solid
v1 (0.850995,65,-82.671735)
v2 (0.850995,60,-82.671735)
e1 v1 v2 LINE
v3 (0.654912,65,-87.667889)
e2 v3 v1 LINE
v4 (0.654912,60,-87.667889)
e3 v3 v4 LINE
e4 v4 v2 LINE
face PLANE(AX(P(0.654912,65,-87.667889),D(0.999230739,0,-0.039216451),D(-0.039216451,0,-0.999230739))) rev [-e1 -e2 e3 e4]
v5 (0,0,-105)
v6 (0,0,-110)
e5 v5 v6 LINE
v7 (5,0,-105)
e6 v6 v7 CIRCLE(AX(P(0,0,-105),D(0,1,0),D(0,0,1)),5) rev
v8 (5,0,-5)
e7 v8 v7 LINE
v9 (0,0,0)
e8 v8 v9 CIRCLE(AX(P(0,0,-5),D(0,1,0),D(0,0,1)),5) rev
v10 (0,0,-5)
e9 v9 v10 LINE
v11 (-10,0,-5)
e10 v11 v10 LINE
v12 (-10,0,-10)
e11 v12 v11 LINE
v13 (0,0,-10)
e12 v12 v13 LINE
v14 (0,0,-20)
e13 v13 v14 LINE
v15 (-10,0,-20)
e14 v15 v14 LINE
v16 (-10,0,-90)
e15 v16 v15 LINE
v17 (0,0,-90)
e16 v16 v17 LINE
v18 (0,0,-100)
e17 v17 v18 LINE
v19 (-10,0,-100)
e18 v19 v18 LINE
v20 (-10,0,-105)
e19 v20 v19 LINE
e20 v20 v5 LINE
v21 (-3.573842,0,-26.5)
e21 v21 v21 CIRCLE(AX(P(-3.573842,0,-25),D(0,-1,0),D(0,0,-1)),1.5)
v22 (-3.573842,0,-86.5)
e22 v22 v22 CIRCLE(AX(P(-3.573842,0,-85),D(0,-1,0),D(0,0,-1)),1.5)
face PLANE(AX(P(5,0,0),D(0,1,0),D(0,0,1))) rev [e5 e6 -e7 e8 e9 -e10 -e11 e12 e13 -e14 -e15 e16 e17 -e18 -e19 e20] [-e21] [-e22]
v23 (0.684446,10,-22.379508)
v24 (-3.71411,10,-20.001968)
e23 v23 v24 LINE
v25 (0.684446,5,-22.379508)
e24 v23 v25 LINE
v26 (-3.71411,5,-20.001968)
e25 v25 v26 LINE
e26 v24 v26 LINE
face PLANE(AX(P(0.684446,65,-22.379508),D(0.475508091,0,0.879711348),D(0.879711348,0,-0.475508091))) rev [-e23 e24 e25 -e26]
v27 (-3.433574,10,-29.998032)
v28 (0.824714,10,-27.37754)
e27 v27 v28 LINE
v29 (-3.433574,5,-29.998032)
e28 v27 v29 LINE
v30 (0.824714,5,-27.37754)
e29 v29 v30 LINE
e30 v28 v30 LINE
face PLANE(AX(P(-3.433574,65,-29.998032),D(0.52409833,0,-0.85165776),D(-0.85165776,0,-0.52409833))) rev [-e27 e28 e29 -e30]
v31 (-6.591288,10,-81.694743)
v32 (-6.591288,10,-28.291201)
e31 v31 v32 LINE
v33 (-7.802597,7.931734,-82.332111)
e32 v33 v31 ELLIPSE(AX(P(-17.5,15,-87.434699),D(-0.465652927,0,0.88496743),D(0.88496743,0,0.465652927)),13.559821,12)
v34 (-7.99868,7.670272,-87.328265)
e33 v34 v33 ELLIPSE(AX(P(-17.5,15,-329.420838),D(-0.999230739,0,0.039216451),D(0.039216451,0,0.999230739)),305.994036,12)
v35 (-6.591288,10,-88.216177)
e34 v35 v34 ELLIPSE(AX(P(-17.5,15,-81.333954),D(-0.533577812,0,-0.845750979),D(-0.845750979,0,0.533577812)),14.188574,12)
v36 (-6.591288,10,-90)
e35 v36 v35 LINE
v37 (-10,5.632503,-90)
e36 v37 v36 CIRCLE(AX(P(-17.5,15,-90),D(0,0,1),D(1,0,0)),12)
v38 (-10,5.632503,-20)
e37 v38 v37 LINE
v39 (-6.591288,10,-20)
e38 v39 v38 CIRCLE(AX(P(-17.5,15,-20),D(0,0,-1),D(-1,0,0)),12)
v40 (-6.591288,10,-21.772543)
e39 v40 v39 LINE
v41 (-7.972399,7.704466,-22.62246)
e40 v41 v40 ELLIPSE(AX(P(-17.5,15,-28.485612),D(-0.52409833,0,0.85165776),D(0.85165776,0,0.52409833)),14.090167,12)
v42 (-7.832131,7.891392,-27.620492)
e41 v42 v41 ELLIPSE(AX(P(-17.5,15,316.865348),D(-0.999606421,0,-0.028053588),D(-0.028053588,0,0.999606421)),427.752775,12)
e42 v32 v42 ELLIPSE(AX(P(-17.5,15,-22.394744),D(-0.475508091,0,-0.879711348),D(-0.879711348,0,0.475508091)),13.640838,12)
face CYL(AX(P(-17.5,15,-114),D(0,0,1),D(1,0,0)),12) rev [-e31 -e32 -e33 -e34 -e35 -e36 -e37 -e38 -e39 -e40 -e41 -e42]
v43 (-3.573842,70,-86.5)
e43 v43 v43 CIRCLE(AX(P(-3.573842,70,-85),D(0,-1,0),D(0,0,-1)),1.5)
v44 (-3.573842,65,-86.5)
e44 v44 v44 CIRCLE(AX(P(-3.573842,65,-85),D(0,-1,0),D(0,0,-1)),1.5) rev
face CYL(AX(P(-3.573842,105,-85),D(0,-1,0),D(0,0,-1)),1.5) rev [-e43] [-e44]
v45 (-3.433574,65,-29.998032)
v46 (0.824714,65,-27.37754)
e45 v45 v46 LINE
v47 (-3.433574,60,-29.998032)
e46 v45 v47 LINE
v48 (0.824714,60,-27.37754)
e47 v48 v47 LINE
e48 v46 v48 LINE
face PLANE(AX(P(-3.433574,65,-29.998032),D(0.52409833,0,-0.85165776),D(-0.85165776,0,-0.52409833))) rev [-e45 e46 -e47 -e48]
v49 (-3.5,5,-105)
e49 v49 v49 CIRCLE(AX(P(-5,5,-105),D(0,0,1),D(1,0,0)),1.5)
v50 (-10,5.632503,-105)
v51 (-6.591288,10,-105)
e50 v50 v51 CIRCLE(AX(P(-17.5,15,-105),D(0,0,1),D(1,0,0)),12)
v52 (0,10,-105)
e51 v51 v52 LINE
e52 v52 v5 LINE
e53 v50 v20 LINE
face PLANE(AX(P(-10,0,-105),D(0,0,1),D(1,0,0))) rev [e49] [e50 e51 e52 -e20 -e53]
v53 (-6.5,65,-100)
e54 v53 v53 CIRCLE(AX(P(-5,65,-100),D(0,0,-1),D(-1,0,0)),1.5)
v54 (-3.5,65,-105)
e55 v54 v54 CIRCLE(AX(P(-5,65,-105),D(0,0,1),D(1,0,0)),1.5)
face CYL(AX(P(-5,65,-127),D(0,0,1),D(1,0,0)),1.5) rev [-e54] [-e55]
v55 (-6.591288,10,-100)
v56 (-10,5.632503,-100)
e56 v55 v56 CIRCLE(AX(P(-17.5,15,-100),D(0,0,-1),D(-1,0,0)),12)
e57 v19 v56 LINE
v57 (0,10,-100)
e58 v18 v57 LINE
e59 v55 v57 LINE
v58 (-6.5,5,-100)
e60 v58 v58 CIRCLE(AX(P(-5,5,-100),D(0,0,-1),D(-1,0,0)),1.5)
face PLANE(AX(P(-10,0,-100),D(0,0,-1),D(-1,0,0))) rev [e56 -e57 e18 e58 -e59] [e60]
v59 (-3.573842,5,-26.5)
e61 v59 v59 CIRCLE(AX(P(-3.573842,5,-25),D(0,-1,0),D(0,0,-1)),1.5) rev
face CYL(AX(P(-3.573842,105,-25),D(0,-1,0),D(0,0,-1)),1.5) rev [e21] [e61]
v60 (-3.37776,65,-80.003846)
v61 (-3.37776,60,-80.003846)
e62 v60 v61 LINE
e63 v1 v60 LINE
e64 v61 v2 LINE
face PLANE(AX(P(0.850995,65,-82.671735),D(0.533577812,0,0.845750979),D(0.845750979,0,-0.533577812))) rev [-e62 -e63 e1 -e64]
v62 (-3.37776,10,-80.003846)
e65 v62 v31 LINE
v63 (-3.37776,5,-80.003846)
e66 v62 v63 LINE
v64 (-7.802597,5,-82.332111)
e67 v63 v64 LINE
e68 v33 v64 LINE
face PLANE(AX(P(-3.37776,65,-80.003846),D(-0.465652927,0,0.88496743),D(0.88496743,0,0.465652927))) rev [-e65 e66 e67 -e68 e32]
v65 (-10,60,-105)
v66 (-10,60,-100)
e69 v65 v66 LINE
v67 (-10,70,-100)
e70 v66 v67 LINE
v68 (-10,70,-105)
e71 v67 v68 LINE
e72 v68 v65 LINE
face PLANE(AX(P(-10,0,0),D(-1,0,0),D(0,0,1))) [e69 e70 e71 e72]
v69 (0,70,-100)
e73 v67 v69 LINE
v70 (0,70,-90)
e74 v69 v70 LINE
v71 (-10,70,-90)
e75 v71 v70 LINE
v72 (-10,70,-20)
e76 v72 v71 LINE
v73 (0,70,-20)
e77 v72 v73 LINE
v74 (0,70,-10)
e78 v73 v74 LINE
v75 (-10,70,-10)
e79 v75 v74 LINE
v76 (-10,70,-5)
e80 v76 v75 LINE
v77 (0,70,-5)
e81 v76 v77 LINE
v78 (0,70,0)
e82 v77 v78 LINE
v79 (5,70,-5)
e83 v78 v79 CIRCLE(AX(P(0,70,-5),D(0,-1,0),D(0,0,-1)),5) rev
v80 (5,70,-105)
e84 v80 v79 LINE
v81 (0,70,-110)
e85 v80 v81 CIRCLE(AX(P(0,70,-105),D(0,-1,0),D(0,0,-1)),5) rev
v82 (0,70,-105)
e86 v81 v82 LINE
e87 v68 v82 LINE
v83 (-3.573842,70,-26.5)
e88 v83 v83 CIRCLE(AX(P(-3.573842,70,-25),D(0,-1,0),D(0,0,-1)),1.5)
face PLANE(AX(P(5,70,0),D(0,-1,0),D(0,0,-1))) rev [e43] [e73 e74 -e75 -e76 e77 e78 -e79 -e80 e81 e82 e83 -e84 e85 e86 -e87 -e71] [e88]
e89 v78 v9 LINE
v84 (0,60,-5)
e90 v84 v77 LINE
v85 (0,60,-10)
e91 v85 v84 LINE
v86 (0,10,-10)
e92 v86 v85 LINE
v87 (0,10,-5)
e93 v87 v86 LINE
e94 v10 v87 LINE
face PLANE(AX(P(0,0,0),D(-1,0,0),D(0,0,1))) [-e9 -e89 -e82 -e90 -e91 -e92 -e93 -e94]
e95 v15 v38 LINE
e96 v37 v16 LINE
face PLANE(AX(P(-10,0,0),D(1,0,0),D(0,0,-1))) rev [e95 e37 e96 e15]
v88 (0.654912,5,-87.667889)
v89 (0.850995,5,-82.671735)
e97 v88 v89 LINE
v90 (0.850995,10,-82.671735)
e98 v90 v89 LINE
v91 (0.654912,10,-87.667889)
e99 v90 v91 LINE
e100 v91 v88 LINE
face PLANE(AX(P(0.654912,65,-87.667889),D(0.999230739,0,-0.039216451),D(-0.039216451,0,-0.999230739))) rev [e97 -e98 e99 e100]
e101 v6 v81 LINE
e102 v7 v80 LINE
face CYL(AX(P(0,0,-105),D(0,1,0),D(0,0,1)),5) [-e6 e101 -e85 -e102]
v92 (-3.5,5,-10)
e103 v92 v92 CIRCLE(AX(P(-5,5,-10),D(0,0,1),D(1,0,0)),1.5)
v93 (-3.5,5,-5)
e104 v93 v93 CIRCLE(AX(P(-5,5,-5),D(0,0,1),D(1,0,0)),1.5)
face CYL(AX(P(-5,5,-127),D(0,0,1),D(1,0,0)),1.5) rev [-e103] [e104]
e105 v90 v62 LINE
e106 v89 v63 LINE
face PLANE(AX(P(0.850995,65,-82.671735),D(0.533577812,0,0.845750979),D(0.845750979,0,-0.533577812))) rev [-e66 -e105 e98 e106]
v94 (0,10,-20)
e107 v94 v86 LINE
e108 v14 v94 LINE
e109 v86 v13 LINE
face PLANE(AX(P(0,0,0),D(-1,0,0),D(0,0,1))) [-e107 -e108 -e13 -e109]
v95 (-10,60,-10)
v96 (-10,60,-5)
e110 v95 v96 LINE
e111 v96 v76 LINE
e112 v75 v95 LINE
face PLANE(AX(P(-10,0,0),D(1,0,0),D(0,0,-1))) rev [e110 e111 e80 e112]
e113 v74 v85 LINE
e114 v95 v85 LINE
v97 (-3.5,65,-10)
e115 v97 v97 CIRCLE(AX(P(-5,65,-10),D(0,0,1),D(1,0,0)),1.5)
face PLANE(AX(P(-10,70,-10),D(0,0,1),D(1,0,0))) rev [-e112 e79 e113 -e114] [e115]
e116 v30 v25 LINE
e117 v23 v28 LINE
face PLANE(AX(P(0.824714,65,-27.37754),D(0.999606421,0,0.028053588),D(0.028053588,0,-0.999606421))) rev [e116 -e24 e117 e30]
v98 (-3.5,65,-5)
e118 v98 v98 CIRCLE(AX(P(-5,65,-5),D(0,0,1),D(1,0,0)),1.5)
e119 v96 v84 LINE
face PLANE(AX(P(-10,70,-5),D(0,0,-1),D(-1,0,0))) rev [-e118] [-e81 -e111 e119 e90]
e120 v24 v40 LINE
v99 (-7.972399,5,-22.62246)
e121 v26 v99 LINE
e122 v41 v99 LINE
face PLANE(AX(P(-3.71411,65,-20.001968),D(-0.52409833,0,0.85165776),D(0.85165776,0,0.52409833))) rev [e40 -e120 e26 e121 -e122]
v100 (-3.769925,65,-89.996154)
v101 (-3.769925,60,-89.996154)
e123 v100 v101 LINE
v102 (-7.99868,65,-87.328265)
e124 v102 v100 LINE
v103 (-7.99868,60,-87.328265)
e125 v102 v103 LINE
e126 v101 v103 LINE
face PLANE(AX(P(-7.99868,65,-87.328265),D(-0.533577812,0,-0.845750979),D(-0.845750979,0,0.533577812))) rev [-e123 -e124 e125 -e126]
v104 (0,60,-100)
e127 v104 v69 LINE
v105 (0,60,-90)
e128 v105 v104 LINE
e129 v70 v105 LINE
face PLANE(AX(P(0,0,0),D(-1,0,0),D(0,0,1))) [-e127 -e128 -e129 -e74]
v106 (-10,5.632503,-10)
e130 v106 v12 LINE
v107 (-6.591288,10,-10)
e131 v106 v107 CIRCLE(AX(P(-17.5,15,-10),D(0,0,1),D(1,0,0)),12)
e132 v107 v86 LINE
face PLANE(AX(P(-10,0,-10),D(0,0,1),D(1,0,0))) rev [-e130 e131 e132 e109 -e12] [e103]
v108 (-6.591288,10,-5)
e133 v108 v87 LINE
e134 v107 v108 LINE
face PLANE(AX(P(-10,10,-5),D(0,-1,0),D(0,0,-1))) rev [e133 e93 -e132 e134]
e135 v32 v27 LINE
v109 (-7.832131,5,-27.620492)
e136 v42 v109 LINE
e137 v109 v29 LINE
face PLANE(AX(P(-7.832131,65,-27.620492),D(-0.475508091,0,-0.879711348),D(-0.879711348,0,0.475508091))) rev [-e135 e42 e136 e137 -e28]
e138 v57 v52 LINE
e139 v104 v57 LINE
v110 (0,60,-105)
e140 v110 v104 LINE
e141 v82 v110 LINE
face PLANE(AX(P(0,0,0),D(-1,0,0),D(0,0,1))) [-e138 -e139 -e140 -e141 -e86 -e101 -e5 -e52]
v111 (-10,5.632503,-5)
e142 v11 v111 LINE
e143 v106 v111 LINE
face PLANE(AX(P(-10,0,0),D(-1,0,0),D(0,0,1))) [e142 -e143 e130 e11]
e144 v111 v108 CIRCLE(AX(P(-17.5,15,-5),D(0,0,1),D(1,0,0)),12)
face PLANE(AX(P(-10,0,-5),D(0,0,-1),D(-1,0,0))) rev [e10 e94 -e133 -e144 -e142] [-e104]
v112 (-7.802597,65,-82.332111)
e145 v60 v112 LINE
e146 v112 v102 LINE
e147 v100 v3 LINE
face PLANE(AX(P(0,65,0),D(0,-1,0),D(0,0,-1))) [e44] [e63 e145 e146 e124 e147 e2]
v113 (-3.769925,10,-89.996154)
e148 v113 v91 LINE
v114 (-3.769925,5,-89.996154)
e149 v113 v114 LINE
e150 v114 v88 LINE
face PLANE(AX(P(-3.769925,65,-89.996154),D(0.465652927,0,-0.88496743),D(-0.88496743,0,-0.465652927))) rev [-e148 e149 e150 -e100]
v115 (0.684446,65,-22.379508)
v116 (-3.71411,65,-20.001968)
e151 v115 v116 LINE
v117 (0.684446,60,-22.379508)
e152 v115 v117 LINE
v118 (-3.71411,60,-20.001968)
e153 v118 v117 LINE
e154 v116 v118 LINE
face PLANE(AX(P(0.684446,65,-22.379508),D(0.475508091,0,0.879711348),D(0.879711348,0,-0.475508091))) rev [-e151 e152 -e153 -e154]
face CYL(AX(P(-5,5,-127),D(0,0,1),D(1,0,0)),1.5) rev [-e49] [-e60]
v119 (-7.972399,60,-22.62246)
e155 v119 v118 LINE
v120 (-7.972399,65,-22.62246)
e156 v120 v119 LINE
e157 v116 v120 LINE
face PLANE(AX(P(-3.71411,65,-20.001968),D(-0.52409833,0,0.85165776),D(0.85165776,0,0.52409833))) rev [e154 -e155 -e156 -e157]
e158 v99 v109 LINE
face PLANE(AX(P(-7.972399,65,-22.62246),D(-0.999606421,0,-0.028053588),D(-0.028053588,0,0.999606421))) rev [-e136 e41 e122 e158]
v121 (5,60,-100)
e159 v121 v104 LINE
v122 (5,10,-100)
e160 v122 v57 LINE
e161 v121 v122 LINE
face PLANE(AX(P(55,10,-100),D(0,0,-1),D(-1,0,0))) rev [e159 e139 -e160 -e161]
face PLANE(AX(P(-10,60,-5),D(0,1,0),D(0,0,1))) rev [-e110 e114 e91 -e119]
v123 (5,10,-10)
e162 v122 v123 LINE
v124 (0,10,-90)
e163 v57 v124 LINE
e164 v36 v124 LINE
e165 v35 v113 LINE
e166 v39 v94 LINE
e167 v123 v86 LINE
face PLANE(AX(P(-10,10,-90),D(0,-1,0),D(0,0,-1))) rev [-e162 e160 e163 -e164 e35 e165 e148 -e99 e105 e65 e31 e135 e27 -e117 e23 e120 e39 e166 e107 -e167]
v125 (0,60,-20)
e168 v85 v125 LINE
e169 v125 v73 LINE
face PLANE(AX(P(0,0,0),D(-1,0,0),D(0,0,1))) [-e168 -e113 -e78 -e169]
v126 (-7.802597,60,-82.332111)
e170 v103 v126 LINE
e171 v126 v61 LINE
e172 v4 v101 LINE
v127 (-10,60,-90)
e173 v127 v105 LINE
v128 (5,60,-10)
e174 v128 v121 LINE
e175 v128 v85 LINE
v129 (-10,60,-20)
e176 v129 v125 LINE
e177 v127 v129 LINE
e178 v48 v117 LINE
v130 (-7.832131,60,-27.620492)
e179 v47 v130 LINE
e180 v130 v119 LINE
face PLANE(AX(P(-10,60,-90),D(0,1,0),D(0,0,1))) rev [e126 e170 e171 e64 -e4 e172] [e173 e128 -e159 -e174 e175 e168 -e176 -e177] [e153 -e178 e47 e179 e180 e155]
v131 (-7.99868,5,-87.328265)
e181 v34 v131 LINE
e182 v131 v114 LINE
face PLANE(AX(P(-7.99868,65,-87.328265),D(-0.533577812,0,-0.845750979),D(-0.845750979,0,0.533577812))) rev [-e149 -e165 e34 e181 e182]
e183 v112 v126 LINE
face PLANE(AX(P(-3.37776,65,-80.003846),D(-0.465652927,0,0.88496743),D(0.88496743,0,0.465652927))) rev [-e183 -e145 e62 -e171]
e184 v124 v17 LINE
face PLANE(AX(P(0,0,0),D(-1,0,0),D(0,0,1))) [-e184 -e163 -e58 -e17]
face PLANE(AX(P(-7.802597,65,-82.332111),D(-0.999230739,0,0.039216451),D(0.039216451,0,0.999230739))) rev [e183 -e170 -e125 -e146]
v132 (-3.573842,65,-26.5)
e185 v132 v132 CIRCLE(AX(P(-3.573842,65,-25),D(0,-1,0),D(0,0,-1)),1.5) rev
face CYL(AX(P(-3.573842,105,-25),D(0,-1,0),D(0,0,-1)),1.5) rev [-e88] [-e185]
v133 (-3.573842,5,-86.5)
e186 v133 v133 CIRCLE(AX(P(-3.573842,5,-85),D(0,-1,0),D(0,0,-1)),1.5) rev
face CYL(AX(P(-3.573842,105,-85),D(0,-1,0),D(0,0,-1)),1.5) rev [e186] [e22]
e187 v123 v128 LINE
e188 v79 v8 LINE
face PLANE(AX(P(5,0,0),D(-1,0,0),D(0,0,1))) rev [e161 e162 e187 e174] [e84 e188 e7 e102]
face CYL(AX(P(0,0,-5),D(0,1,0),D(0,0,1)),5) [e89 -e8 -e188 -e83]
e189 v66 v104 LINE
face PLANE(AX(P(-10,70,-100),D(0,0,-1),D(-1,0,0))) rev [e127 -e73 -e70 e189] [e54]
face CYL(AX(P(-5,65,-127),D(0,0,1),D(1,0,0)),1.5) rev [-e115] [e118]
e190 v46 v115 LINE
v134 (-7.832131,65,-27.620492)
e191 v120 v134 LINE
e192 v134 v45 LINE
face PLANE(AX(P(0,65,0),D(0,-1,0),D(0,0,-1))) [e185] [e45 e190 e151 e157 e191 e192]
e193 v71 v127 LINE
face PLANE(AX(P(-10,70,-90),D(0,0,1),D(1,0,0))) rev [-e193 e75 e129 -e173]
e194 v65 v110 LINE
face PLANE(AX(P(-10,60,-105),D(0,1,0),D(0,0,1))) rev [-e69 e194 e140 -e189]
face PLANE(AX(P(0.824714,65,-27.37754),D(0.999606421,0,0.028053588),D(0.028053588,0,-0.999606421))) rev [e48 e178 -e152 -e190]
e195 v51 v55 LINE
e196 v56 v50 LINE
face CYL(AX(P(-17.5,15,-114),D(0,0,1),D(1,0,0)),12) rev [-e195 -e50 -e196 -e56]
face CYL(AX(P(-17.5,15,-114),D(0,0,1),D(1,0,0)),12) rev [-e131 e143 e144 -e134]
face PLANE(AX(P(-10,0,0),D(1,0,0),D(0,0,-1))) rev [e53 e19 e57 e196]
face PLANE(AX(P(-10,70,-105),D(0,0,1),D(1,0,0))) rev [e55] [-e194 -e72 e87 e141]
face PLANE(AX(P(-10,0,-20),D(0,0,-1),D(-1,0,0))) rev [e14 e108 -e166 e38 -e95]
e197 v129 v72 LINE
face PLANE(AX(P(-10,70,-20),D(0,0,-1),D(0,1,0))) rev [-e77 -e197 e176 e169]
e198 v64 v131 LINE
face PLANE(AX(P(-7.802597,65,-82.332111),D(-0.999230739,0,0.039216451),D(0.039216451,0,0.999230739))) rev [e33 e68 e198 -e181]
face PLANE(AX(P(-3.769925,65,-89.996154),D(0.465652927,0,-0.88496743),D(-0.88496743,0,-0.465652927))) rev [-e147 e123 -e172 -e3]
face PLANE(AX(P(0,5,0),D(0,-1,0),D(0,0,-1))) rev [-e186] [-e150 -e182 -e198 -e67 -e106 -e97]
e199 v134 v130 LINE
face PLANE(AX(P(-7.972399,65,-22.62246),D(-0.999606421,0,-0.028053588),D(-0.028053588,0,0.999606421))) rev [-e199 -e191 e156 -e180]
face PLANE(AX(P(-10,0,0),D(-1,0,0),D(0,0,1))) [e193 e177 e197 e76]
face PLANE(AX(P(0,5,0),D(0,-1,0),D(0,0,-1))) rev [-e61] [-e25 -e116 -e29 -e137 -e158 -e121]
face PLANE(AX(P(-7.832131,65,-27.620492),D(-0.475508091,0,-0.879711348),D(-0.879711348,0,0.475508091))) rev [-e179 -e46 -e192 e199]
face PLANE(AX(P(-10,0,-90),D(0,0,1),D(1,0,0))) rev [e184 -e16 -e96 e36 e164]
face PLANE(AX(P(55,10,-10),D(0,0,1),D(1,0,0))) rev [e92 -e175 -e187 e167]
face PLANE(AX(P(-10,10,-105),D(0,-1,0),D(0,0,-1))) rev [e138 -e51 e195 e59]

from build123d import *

# Parameters (mm, degrees)
SKETCH1_W               = 110
SKETCH1_H               = 70
BOSS_EXTRUDE1_DEPTH     = 5
FILLET2_R               = 5
FILLET3_R               = 5
SKETCH2_W               = 5
SKETCH2_H               = 10
BOSS_EXTRUDE2_DEPTH     = 10
SKETCH3_R               = 1.5
CUT_EXTRUDE1_DEPTH      = 122
SKETCH4_W               = 70
SKETCH4_H               = 10
BOSS_EXTRUDE3_DEPTH     = 10
SKETCH5_R               = 11.5
CUT_EXTRUDE2_DEPTH      = 105
SKETCH6_R               = 1.5
CUT_EXTRUDE3_DEPTH      = 105
CUT_EXTRUDE4_DEPTH      = 55
CUT_EXTRUDE4_DEPTH_BACK = 5
SKETCH9_W               = 90
SKETCH9_H               = 50
CUT_EXTRUDE5_DEPTH      = 55
SKETCH10_R              = 12
CUT_EXTRUDE6_DEPTH      = 109


with BuildPart() as part:
    # Sketch1 → Boss-Extrude1 (new body)
    with BuildSketch(Plane(origin=(0, 0, 0), x_dir=(0, 0, -1), z_dir=(1, 0, 0))):
        with Locations((55, 35)):
            Rectangle(SKETCH1_W, SKETCH1_H)
    extrude(amount=BOSS_EXTRUDE1_DEPTH)

    # Fillet2
    fillet2_edges = [part.edges().sort_by_distance(p)[0] for p in [
        (5, 35, 0),
    ]]
    fillet(fillet2_edges, radius=FILLET2_R - 0.0001)  # a hair under: the kernel refuses the full size

    # Fillet3
    fillet3_edges = [part.edges().sort_by_distance(p)[0] for p in [
        (5, 35, -110),
    ]]
    fillet(fillet3_edges, radius=FILLET3_R - 0.0001)  # a hair under: the kernel refuses the full size

    # Sketch2 → Boss-Extrude2 (add)
    with BuildSketch(Plane.ZY):
        with Locations((-102.5, 65)):
            Rectangle(SKETCH2_W, SKETCH2_H)
        with Locations((-102.5, 5)):
            Rectangle(SKETCH2_W, SKETCH2_H)
        with Locations((-7.5, 5)):
            Rectangle(SKETCH2_W, SKETCH2_H)
        with Locations((-7.5, 65)):
            Rectangle(SKETCH2_W, SKETCH2_H)
    extrude(amount=BOSS_EXTRUDE2_DEPTH)

    # Sketch3 → Cut-Extrude1 (cut)
    with BuildSketch(Plane.XY.offset(-5)):
        with Locations((-5, 65)):
            Circle(SKETCH3_R)
        with Locations((-5, 5)):
            Circle(SKETCH3_R)
    extrude(amount=-CUT_EXTRUDE1_DEPTH, mode=Mode.SUBTRACT)

    # Sketch4 → Boss-Extrude3 (add)
    with BuildSketch(Plane.ZY):
        with Locations((-55, 65)):
            Rectangle(SKETCH4_W, SKETCH4_H)
        with Locations((-55, 5)):
            Rectangle(SKETCH4_W, SKETCH4_H)
    extrude(amount=BOSS_EXTRUDE3_DEPTH)

    # Sketch5 → Cut-Extrude2 (cut)
    with BuildSketch(Plane.XY.offset(-5)):
        with Locations((-17.5, 15)):
            Circle(SKETCH5_R)
    extrude(amount=-CUT_EXTRUDE2_DEPTH, mode=Mode.SUBTRACT)

    # Sketch6 → Cut-Extrude3 (cut)
    with BuildSketch(Plane.XZ):
        with Locations(Location((-3.573842411, -25, 0), (0, 0, 270))):
            Circle(SKETCH6_R)
        with Locations(Location((-3.573842411, -85, 0), (0, 0, 270))):
            Circle(SKETCH6_R)
    extrude(amount=-CUT_EXTRUDE3_DEPTH, mode=Mode.SUBTRACT)

    # Sketch7 → Cut-Extrude4 (cut, two sides: drawn at the far end of the back side and taken through both)
    with BuildSketch(Plane.XZ.offset(-60).offset(-CUT_EXTRUDE4_DEPTH_BACK)):
        Polygon((0.824714328, -27.377540454), (0.68444639, -22.37950835), (-3.71411035, -20.001967897), (-7.972399151, -22.622459546), (-7.832131212, -27.62049165), (-3.433574473, -29.998032103), align=None)
        Polygon((0.654912484, -87.66788906), (0.850994737, -82.671735365), (-3.377760158, -80.003846304), (-7.802597306, -82.33211094), (-7.99867956, -87.328264635), (-3.769924665, -89.996153696), align=None)
    extrude(amount=CUT_EXTRUDE4_DEPTH + CUT_EXTRUDE4_DEPTH_BACK, mode=Mode.SUBTRACT)

    # Sketch9 → Cut-Extrude5 (cut)
    with BuildSketch(Plane.ZY):
        with Locations((-55, 35)):
            Rectangle(SKETCH9_W, SKETCH9_H)
    extrude(amount=-CUT_EXTRUDE5_DEPTH, mode=Mode.SUBTRACT)

    # Sketch10 → Cut-Extrude6 (cut)
    with BuildSketch(Plane.XY.offset(-5)):
        with Locations((-17.5, 15)):
            Circle(SKETCH10_R)
    extrude(amount=-CUT_EXTRUDE6_DEPTH, mode=Mode.SUBTRACT)


solid = part.part
